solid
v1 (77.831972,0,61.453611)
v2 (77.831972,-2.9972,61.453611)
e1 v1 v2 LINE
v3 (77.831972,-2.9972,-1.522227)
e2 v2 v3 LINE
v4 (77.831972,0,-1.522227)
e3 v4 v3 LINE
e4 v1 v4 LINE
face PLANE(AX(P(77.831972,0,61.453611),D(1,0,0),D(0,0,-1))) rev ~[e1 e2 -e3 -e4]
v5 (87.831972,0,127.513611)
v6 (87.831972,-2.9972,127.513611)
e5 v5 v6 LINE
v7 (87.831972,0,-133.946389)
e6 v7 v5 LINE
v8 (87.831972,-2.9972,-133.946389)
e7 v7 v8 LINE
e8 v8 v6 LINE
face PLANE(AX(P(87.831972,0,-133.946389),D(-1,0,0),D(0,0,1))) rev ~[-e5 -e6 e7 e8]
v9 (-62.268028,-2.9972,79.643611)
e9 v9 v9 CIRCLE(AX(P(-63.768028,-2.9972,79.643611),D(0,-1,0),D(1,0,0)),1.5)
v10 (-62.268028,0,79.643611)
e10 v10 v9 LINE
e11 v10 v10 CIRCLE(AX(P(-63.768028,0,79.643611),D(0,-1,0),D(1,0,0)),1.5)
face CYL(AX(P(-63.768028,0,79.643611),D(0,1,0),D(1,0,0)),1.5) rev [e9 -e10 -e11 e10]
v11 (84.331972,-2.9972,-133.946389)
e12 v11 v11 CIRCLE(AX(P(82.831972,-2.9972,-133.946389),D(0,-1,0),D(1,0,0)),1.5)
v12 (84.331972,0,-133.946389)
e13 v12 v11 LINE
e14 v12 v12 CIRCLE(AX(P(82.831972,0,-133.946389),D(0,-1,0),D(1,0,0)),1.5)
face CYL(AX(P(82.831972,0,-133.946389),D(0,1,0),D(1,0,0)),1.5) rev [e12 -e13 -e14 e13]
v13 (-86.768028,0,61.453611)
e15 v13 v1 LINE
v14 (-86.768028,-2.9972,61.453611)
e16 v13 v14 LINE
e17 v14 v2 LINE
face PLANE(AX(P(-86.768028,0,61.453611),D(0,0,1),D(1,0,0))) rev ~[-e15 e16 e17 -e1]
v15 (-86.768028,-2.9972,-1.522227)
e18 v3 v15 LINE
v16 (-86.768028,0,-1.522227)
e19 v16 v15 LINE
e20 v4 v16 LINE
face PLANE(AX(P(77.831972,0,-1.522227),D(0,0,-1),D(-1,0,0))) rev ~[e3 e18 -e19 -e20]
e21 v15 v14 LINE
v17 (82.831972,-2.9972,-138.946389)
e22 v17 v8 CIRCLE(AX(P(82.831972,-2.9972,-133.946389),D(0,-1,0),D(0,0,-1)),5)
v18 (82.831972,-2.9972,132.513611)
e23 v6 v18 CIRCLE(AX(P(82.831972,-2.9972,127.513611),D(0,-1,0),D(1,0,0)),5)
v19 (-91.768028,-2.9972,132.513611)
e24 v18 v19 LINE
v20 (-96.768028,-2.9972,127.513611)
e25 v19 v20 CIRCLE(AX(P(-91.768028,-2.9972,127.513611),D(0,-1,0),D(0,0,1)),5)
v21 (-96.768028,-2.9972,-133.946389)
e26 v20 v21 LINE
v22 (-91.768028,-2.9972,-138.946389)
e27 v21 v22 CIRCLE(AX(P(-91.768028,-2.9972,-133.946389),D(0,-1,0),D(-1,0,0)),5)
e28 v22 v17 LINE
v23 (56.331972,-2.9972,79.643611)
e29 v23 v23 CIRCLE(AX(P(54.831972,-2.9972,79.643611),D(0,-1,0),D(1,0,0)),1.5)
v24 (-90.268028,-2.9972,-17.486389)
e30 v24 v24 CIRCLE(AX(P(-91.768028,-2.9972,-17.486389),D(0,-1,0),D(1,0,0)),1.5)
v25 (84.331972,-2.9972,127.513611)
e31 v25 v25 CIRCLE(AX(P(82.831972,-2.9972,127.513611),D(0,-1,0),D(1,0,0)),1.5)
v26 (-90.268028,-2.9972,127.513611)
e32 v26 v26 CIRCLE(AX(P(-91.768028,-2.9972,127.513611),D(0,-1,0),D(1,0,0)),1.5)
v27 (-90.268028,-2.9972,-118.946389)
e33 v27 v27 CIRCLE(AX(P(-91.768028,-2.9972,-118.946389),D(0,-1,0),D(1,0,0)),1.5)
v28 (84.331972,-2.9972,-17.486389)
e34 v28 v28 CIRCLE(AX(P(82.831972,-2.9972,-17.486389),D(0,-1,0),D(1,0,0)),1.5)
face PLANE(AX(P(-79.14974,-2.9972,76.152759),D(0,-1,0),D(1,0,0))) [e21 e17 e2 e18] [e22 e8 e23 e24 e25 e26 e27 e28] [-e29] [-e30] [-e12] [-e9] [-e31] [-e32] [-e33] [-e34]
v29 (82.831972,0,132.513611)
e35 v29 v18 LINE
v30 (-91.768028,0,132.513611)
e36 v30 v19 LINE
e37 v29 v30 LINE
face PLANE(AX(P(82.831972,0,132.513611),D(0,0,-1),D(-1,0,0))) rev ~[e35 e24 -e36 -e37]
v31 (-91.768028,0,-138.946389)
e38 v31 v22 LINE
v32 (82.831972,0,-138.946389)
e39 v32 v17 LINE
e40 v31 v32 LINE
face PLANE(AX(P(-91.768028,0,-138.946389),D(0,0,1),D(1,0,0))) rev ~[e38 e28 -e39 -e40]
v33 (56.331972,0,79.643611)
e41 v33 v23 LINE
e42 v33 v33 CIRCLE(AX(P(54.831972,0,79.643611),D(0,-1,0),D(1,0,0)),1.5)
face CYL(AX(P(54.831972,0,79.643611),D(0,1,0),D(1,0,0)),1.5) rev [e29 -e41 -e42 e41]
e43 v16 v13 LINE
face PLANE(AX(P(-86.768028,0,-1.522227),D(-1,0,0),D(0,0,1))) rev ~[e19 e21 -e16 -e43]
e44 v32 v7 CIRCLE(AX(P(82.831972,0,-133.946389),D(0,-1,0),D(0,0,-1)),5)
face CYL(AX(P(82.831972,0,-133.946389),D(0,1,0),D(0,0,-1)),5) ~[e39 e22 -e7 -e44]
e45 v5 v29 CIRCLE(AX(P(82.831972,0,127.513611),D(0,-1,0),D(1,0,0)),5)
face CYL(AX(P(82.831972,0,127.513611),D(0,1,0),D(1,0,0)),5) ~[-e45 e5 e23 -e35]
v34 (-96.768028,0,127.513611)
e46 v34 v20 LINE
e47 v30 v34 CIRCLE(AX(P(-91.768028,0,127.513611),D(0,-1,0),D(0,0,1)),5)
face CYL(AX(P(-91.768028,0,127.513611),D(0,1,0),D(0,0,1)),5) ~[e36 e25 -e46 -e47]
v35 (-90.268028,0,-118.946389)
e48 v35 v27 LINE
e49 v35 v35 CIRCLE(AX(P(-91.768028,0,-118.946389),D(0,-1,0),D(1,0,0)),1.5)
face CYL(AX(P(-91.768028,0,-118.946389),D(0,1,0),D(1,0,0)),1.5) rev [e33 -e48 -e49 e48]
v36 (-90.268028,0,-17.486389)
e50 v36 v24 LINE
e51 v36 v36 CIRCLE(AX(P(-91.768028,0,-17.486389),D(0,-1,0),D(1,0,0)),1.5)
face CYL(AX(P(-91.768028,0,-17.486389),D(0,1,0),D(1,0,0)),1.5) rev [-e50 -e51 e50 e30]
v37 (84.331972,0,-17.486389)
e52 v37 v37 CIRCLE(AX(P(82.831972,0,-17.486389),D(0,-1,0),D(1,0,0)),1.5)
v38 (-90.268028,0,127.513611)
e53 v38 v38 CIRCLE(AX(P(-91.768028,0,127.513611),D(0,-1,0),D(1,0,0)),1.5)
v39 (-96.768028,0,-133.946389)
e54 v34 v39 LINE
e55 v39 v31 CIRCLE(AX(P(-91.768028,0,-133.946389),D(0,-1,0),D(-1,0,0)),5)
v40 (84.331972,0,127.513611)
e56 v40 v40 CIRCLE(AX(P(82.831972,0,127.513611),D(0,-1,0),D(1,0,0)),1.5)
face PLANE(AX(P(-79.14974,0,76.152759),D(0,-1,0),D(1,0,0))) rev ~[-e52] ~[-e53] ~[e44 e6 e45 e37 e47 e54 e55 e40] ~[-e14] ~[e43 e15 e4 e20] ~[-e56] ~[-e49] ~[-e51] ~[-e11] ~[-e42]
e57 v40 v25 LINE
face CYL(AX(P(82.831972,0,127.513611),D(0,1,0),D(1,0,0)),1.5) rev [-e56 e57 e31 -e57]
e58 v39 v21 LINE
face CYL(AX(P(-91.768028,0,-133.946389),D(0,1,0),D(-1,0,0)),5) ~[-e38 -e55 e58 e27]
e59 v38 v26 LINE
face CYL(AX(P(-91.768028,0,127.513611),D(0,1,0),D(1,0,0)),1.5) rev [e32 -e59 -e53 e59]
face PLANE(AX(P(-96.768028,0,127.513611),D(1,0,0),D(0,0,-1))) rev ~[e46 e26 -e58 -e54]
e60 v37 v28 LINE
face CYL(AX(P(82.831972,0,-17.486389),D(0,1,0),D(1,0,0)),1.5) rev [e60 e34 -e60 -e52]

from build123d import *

# Parameters (mm, degrees)
F0_R     = 1.5
F0_W     = 40
F0_H     = 6.7
F0_H_2   = 1.6
F0_W_2   = 10
F0_H_3   = 91.46
F0_W_3   = 15
F0_H_4   = 1.7
F0_H_5   = 15
F0_H_6   = 5
F0_H_7   = 52.41
F0_H_8   = 3.65
F0_H_9   = 1.48
F0_W_4   = 3
F0_H_10  = 0.6
F0_H_11  = 1.4
F1_DEPTH = 2.9972


# Not quite as in the source:
# - a feature names something its author has since deleted; it is built from what else it names


with BuildPart() as f1:
    # F0 (on Front) → F1 (new body)
    with BuildSketch(Plane.XZ):
        with BuildLine():
            Line((-24.4680281997, 132.5136111658), (-91.7680281997, 132.5136111658))
            ThreePointArc((-91.7680281997, 132.5136111658), (-95.3035621056, 131.0491450717), (-96.7680281997, 127.5136111658))
            Line((-96.7680281997, 127.5136111658), (-96.7680281997, -22.4863888342))
            Line((-96.7680281997, -22.4863888342), (-86.7680281997, -22.4863888342))
            Line((-86.7680281997, -22.4863888342), (-86.7680281997, -1.5222273069))
            Line((-86.7680281997, -1.5222273069), (-86.7680281997, 0))
            Line((-86.7680281997, 0), (-86.7680281997, 16.1536111658))
            Line((-86.7680281997, 16.1536111658), (-86.7680281997, 20.4536111658))
            Line((-86.7680281997, 20.4536111658), (-86.7680281997, 21.4536111658))
            Line((-86.7680281997, 21.4536111658), (-89.7680281997, 21.4536111658))
            Line((-89.7680281997, 21.4536111658), (-89.7680281997, 22.0536111658))
            Line((-89.7680281997, 22.0536111658), (-89.7680281997, 22.8536111658))
            Line((-89.7680281997, 22.8536111658), (-89.7680281997, 23.4536111658))
            Line((-89.7680281997, 23.4536111658), (-86.7680281997, 23.4536111658))
            Line((-86.7680281997, 23.4536111658), (-86.7680281997, 24.4536111658))
            Line((-86.7680281997, 24.4536111658), (-86.7680281997, 24.6436111658))
            Line((-86.7680281997, 24.6436111658), (-86.7680281997, 53.4536111658))
            Line((-86.7680281997, 53.4536111658), (-86.7680281997, 56.4536111658))
            Line((-86.7680281997, 56.4536111658), (-86.7680281997, 60.7536111658))
            Line((-86.7680281997, 60.7536111658), (-86.7680281997, 61.4536111658))
            Line((-86.7680281997, 61.4536111658), (-86.7680281997, 122.5136111658))
            Line((-86.7680281997, 122.5136111658), (-40.4680281997, 122.5136111658))
            Line((-40.4680281997, 122.5136111658), (-39.4680281997, 122.5136111658))
            Line((-39.4680281997, 122.5136111658), (-39.4680281997, 124.2136111658))
            Line((-39.4680281997, 124.2136111658), (-49.4680281997, 124.2136111658))
            Line((-49.4680281997, 124.2136111658), (-49.4680281997, 125.8136111658))
            Line((-49.4680281997, 125.8136111658), (-28.7680281997, 125.8136111658))
            Line((-28.7680281997, 125.8136111658), (-24.4680281997, 125.8136111658))
            Line((-24.4680281997, 125.8136111658), (-24.4680281997, 132.5136111658))
        make_face()
        with Locations((-91.7680281997, -17.4863888342)):
            Circle(F0_R, mode=Mode.SUBTRACT)
        with Locations((-91.7680281997, 127.5136111658)):
            Circle(F0_R, mode=Mode.SUBTRACT)
        with Locations((-4.4680281997, 129.1636111658)):
            Rectangle(F0_W, F0_H)
        with BuildLine():
            Line((82.8319718003, 132.5136111658), (15.5319718003, 132.5136111658))
            Line((15.5319718003, 132.5136111658), (15.5319718003, 125.8136111658))
            Line((15.5319718003, 125.8136111658), (21.2319718003, 125.8136111658))
            Line((21.2319718003, 125.8136111658), (40.5319718003, 125.8136111658))
            Line((40.5319718003, 125.8136111658), (40.5319718003, 124.2136111658))
            Line((40.5319718003, 124.2136111658), (30.5319718003, 124.2136111658))
            Line((30.5319718003, 124.2136111658), (30.5319718003, 122.5136111658))
            Line((30.5319718003, 122.5136111658), (40.5319718003, 122.5136111658))
            Line((40.5319718003, 122.5136111658), (77.8319718003, 122.5136111658))
            Line((77.8319718003, 122.5136111658), (77.8319718003, 61.4536111658))
            Line((77.8319718003, 61.4536111658), (77.8319718003, 60.7536111658))
            Line((77.8319718003, 60.7536111658), (77.8319718003, 56.4536111658))
            Line((77.8319718003, 56.4536111658), (77.8319718003, 53.4536111658))
            Line((77.8319718003, 53.4536111658), (77.8319718003, 24.6436111658))
            Line((77.8319718003, 24.6436111658), (77.8319718003, 24.4536111658))
            Line((77.8319718003, 24.4536111658), (77.8319718003, 23.4536111658))
            Line((77.8319718003, 23.4536111658), (80.8319718003, 23.4536111658))
            Line((80.8319718003, 23.4536111658), (80.8319718003, 22.8536111658))
            Line((80.8319718003, 22.8536111658), (80.8319718003, 21.4536111658))
            Line((80.8319718003, 21.4536111658), (77.8319718003, 21.4536111658))
            Line((77.8319718003, 21.4536111658), (77.8319718003, 20.4536111658))
            Line((77.8319718003, 20.4536111658), (77.8319718003, 16.1536111658))
            Line((77.8319718003, 16.1536111658), (77.8319718003, 4.5))
            Line((77.8319718003, 4.5), (77.8319718003, -1.5222273069))
            Line((77.8319718003, -1.5222273069), (77.8319718003, -128.9463888342))
            Line((77.8319718003, -128.9463888342), (1.2319718003, -128.9463888342))
            Line((1.2319718003, -128.9463888342), (1.2319718003, -130.4263888342))
            Line((1.2319718003, -130.4263888342), (3.7319718003, -130.4263888342))
            Line((3.7319718003, -130.4263888342), (3.7319718003, -132.0263888342))
            Line((3.7319718003, -132.0263888342), (-11.2680281997, -132.0263888342))
            Line((-11.2680281997, -132.0263888342), (-11.2680281997, -130.4263888342))
            Line((-11.2680281997, -130.4263888342), (-8.7680281997, -130.4263888342))
            Line((-8.7680281997, -130.4263888342), (-8.7680281997, -128.9463888342))
            Line((-8.7680281997, -128.9463888342), (-86.7680281997, -128.9463888342))
            Line((-86.7680281997, -128.9463888342), (-96.7680281997, -128.9463888342))
            Line((-96.7680281997, -128.9463888342), (-96.7680281997, -132.2803888342))
            Line((-96.7680281997, -132.2803888342), (-96.7680281997, -133.9463888342))
            ThreePointArc((-96.7680281997, -133.9463888342), (-95.3035621056, -137.4819227401), (-91.7680281997, -138.9463888342))
            Line((-91.7680281997, -138.9463888342), (82.8319718003, -138.9463888342))
            ThreePointArc((82.8319718003, -138.9463888342), (86.3675057063, -137.4819227401), (87.8319718003, -133.9463888342))
            Line((87.8319718003, -133.9463888342), (87.8319718003, 127.5136111658))
            ThreePointArc((87.8319718003, 127.5136111658), (86.3675057063, 131.0491450717), (82.8319718003, 132.5136111658))
        make_face()
        with Locations((82.8319718003, -133.9463888342)):
            Circle(F0_R, mode=Mode.SUBTRACT)
        with Locations((82.8319718003, -17.4863888342)):
            Circle(F0_R, mode=Mode.SUBTRACT)
        with Locations((82.8319718003, 127.5136111658)):
            Circle(F0_R, mode=Mode.SUBTRACT)
        Polygon((-24.4680281997, 124.2136111658), (-24.4680281997, 125.8136111658), (-28.7680281997, 125.8136111658), (-49.4680281997, 125.8136111658), (-49.4680281997, 124.2136111658), (-39.4680281997, 124.2136111658), align=None)
        with Locations((-4.4680281997, 125.0136111658)):
            Rectangle(F0_W, F0_H_2)
        with Locations((-91.7680281997, -68.2163888342)):
            Rectangle(F0_W_2, F0_H_3)
        Polygon((21.2319718003, 125.8136111658), (15.5319718003, 125.8136111658), (15.5319718003, 124.2136111658), (30.5319718003, 124.2136111658), (40.5319718003, 124.2136111658), (40.5319718003, 125.8136111658), align=None)
        with Locations((-31.9680281997, 123.3636111658)):
            Rectangle(F0_W_3, F0_H_4)
        with Locations((-4.4680281997, 123.3636111658)):
            Rectangle(F0_W, F0_H_4)
        with Locations((-91.7680281997, -121.4463888342)):
            Rectangle(F0_W_2, F0_H_5)
        with Locations((-91.7680281997, -118.9463888342)):
            Circle(F0_R, mode=Mode.SUBTRACT)
        Polygon((-86.7680281997, -1.5222273069), (-86.7680281997, -22.4863888342), (-86.7680281997, -113.9463888342), (-86.7680281997, -128.9463888342), (-8.7680281997, -128.9463888342), (1.2319718003, -128.9463888342), (77.8319718003, -128.9463888342), (77.8319718003, -1.5222273069), align=None)
        with Locations((23.0319718003, 123.3636111658)):
            Rectangle(F0_W_3, F0_H_4)
        with Locations((-31.9680281997, 120.0136111658)):
            Rectangle(F0_W_3, F0_H_6)
        with Locations((-4.4680281997, 120.0136111658)):
            Rectangle(F0_W, F0_H_6)
        with Locations((23.0319718003, 120.0136111658)):
            Rectangle(F0_W_3, F0_H_6)
        Polygon((-39.4680281997, 117.5136111658), (-39.4680281997, 122.5136111658), (-40.4680281997, 122.5136111658), (-86.7680281997, 122.5136111658), (-86.7680281997, 61.4536111658), (-79.4680281997, 61.4536111658), (-79.4680281997, 65.1036111658), (-66.1611799171, 65.1036111658), align=None)
        with Locations((-63.7680281997, 79.6436111658)):
            Circle(F0_R, mode=Mode.SUBTRACT)
        Polygon((-24.4680281997, 65.1036111658), (-24.4680281997, 117.5136111658), (-39.4680281997, 117.5136111658), (-66.1611799171, 65.1036111658), align=None)
        with Locations((-4.4680281997, 91.3086111658)):
            Rectangle(F0_W, F0_H_7)
        Polygon((40.5319718003, 122.5136111658), (30.5319718003, 122.5136111658), (30.5319718003, 117.5136111658), (57.2251235178, 65.1036111658), (70.5319718003, 65.1036111658), (70.5319718003, 61.4536111658), (77.8319718003, 61.4536111658), (77.8319718003, 122.5136111658), align=None)
        with Locations((54.8319718003, 79.6436111658)):
            Circle(F0_R, mode=Mode.SUBTRACT)
        Polygon((30.5319718003, 117.5136111658), (15.5319718003, 117.5136111658), (15.5319718003, 65.1036111658), (57.2251235178, 65.1036111658), align=None)
        with Locations((-4.4680281997, 63.2786111658)):
            Rectangle(F0_W, F0_H_8)
        Polygon((-24.4680281997, 61.4536111658), (-24.4680281997, 65.1036111658), (-66.1611799171, 65.1036111658), (-68.0201763638, 61.4536111658), align=None)
        with Locations((-3.7680281997, -129.6863888342)):
            Rectangle(F0_W_2, F0_H_9)
        Polygon((57.2251235178, 65.1036111658), (15.5319718003, 65.1036111658), (15.5319718003, 61.4536111658), (59.0841199644, 61.4536111658), align=None)
        Polygon((-68.0201763638, 61.4536111658), (-66.1611799171, 65.1036111658), (-79.4680281997, 65.1036111658), (-79.4680281997, 61.4536111658), align=None)
        Polygon((1.2319718003, -130.4263888342), (-8.7680281997, -130.4263888342), (-11.2680281997, -130.4263888342), (-11.2680281997, -132.0263888342), (3.7319718003, -132.0263888342), (3.7319718003, -130.4263888342), align=None)
        Polygon((70.5319718003, 65.1036111658), (57.2251235178, 65.1036111658), (59.0841199644, 61.4536111658), (70.5319718003, 61.4536111658), align=None)
        Polygon((-89.7680281997, 21.4536111658), (-86.7680281997, 21.4536111658), (-86.7680281997, 22.8536111658), (-89.7680281997, 22.8536111658), (-89.7680281997, 22.0536111658), align=None)
        with Locations((-88.2680281997, 23.1536111658)):
            Rectangle(F0_W_4, F0_H_10)
        with Locations((79.3319718003, 22.1536111658)):
            Rectangle(F0_W_4, F0_H_11)
        with Locations((79.3319718003, 23.1536111658)):
            Rectangle(F0_W_4, F0_H_10)
    extrude(amount=F1_DEPTH)


solid = f1.part
